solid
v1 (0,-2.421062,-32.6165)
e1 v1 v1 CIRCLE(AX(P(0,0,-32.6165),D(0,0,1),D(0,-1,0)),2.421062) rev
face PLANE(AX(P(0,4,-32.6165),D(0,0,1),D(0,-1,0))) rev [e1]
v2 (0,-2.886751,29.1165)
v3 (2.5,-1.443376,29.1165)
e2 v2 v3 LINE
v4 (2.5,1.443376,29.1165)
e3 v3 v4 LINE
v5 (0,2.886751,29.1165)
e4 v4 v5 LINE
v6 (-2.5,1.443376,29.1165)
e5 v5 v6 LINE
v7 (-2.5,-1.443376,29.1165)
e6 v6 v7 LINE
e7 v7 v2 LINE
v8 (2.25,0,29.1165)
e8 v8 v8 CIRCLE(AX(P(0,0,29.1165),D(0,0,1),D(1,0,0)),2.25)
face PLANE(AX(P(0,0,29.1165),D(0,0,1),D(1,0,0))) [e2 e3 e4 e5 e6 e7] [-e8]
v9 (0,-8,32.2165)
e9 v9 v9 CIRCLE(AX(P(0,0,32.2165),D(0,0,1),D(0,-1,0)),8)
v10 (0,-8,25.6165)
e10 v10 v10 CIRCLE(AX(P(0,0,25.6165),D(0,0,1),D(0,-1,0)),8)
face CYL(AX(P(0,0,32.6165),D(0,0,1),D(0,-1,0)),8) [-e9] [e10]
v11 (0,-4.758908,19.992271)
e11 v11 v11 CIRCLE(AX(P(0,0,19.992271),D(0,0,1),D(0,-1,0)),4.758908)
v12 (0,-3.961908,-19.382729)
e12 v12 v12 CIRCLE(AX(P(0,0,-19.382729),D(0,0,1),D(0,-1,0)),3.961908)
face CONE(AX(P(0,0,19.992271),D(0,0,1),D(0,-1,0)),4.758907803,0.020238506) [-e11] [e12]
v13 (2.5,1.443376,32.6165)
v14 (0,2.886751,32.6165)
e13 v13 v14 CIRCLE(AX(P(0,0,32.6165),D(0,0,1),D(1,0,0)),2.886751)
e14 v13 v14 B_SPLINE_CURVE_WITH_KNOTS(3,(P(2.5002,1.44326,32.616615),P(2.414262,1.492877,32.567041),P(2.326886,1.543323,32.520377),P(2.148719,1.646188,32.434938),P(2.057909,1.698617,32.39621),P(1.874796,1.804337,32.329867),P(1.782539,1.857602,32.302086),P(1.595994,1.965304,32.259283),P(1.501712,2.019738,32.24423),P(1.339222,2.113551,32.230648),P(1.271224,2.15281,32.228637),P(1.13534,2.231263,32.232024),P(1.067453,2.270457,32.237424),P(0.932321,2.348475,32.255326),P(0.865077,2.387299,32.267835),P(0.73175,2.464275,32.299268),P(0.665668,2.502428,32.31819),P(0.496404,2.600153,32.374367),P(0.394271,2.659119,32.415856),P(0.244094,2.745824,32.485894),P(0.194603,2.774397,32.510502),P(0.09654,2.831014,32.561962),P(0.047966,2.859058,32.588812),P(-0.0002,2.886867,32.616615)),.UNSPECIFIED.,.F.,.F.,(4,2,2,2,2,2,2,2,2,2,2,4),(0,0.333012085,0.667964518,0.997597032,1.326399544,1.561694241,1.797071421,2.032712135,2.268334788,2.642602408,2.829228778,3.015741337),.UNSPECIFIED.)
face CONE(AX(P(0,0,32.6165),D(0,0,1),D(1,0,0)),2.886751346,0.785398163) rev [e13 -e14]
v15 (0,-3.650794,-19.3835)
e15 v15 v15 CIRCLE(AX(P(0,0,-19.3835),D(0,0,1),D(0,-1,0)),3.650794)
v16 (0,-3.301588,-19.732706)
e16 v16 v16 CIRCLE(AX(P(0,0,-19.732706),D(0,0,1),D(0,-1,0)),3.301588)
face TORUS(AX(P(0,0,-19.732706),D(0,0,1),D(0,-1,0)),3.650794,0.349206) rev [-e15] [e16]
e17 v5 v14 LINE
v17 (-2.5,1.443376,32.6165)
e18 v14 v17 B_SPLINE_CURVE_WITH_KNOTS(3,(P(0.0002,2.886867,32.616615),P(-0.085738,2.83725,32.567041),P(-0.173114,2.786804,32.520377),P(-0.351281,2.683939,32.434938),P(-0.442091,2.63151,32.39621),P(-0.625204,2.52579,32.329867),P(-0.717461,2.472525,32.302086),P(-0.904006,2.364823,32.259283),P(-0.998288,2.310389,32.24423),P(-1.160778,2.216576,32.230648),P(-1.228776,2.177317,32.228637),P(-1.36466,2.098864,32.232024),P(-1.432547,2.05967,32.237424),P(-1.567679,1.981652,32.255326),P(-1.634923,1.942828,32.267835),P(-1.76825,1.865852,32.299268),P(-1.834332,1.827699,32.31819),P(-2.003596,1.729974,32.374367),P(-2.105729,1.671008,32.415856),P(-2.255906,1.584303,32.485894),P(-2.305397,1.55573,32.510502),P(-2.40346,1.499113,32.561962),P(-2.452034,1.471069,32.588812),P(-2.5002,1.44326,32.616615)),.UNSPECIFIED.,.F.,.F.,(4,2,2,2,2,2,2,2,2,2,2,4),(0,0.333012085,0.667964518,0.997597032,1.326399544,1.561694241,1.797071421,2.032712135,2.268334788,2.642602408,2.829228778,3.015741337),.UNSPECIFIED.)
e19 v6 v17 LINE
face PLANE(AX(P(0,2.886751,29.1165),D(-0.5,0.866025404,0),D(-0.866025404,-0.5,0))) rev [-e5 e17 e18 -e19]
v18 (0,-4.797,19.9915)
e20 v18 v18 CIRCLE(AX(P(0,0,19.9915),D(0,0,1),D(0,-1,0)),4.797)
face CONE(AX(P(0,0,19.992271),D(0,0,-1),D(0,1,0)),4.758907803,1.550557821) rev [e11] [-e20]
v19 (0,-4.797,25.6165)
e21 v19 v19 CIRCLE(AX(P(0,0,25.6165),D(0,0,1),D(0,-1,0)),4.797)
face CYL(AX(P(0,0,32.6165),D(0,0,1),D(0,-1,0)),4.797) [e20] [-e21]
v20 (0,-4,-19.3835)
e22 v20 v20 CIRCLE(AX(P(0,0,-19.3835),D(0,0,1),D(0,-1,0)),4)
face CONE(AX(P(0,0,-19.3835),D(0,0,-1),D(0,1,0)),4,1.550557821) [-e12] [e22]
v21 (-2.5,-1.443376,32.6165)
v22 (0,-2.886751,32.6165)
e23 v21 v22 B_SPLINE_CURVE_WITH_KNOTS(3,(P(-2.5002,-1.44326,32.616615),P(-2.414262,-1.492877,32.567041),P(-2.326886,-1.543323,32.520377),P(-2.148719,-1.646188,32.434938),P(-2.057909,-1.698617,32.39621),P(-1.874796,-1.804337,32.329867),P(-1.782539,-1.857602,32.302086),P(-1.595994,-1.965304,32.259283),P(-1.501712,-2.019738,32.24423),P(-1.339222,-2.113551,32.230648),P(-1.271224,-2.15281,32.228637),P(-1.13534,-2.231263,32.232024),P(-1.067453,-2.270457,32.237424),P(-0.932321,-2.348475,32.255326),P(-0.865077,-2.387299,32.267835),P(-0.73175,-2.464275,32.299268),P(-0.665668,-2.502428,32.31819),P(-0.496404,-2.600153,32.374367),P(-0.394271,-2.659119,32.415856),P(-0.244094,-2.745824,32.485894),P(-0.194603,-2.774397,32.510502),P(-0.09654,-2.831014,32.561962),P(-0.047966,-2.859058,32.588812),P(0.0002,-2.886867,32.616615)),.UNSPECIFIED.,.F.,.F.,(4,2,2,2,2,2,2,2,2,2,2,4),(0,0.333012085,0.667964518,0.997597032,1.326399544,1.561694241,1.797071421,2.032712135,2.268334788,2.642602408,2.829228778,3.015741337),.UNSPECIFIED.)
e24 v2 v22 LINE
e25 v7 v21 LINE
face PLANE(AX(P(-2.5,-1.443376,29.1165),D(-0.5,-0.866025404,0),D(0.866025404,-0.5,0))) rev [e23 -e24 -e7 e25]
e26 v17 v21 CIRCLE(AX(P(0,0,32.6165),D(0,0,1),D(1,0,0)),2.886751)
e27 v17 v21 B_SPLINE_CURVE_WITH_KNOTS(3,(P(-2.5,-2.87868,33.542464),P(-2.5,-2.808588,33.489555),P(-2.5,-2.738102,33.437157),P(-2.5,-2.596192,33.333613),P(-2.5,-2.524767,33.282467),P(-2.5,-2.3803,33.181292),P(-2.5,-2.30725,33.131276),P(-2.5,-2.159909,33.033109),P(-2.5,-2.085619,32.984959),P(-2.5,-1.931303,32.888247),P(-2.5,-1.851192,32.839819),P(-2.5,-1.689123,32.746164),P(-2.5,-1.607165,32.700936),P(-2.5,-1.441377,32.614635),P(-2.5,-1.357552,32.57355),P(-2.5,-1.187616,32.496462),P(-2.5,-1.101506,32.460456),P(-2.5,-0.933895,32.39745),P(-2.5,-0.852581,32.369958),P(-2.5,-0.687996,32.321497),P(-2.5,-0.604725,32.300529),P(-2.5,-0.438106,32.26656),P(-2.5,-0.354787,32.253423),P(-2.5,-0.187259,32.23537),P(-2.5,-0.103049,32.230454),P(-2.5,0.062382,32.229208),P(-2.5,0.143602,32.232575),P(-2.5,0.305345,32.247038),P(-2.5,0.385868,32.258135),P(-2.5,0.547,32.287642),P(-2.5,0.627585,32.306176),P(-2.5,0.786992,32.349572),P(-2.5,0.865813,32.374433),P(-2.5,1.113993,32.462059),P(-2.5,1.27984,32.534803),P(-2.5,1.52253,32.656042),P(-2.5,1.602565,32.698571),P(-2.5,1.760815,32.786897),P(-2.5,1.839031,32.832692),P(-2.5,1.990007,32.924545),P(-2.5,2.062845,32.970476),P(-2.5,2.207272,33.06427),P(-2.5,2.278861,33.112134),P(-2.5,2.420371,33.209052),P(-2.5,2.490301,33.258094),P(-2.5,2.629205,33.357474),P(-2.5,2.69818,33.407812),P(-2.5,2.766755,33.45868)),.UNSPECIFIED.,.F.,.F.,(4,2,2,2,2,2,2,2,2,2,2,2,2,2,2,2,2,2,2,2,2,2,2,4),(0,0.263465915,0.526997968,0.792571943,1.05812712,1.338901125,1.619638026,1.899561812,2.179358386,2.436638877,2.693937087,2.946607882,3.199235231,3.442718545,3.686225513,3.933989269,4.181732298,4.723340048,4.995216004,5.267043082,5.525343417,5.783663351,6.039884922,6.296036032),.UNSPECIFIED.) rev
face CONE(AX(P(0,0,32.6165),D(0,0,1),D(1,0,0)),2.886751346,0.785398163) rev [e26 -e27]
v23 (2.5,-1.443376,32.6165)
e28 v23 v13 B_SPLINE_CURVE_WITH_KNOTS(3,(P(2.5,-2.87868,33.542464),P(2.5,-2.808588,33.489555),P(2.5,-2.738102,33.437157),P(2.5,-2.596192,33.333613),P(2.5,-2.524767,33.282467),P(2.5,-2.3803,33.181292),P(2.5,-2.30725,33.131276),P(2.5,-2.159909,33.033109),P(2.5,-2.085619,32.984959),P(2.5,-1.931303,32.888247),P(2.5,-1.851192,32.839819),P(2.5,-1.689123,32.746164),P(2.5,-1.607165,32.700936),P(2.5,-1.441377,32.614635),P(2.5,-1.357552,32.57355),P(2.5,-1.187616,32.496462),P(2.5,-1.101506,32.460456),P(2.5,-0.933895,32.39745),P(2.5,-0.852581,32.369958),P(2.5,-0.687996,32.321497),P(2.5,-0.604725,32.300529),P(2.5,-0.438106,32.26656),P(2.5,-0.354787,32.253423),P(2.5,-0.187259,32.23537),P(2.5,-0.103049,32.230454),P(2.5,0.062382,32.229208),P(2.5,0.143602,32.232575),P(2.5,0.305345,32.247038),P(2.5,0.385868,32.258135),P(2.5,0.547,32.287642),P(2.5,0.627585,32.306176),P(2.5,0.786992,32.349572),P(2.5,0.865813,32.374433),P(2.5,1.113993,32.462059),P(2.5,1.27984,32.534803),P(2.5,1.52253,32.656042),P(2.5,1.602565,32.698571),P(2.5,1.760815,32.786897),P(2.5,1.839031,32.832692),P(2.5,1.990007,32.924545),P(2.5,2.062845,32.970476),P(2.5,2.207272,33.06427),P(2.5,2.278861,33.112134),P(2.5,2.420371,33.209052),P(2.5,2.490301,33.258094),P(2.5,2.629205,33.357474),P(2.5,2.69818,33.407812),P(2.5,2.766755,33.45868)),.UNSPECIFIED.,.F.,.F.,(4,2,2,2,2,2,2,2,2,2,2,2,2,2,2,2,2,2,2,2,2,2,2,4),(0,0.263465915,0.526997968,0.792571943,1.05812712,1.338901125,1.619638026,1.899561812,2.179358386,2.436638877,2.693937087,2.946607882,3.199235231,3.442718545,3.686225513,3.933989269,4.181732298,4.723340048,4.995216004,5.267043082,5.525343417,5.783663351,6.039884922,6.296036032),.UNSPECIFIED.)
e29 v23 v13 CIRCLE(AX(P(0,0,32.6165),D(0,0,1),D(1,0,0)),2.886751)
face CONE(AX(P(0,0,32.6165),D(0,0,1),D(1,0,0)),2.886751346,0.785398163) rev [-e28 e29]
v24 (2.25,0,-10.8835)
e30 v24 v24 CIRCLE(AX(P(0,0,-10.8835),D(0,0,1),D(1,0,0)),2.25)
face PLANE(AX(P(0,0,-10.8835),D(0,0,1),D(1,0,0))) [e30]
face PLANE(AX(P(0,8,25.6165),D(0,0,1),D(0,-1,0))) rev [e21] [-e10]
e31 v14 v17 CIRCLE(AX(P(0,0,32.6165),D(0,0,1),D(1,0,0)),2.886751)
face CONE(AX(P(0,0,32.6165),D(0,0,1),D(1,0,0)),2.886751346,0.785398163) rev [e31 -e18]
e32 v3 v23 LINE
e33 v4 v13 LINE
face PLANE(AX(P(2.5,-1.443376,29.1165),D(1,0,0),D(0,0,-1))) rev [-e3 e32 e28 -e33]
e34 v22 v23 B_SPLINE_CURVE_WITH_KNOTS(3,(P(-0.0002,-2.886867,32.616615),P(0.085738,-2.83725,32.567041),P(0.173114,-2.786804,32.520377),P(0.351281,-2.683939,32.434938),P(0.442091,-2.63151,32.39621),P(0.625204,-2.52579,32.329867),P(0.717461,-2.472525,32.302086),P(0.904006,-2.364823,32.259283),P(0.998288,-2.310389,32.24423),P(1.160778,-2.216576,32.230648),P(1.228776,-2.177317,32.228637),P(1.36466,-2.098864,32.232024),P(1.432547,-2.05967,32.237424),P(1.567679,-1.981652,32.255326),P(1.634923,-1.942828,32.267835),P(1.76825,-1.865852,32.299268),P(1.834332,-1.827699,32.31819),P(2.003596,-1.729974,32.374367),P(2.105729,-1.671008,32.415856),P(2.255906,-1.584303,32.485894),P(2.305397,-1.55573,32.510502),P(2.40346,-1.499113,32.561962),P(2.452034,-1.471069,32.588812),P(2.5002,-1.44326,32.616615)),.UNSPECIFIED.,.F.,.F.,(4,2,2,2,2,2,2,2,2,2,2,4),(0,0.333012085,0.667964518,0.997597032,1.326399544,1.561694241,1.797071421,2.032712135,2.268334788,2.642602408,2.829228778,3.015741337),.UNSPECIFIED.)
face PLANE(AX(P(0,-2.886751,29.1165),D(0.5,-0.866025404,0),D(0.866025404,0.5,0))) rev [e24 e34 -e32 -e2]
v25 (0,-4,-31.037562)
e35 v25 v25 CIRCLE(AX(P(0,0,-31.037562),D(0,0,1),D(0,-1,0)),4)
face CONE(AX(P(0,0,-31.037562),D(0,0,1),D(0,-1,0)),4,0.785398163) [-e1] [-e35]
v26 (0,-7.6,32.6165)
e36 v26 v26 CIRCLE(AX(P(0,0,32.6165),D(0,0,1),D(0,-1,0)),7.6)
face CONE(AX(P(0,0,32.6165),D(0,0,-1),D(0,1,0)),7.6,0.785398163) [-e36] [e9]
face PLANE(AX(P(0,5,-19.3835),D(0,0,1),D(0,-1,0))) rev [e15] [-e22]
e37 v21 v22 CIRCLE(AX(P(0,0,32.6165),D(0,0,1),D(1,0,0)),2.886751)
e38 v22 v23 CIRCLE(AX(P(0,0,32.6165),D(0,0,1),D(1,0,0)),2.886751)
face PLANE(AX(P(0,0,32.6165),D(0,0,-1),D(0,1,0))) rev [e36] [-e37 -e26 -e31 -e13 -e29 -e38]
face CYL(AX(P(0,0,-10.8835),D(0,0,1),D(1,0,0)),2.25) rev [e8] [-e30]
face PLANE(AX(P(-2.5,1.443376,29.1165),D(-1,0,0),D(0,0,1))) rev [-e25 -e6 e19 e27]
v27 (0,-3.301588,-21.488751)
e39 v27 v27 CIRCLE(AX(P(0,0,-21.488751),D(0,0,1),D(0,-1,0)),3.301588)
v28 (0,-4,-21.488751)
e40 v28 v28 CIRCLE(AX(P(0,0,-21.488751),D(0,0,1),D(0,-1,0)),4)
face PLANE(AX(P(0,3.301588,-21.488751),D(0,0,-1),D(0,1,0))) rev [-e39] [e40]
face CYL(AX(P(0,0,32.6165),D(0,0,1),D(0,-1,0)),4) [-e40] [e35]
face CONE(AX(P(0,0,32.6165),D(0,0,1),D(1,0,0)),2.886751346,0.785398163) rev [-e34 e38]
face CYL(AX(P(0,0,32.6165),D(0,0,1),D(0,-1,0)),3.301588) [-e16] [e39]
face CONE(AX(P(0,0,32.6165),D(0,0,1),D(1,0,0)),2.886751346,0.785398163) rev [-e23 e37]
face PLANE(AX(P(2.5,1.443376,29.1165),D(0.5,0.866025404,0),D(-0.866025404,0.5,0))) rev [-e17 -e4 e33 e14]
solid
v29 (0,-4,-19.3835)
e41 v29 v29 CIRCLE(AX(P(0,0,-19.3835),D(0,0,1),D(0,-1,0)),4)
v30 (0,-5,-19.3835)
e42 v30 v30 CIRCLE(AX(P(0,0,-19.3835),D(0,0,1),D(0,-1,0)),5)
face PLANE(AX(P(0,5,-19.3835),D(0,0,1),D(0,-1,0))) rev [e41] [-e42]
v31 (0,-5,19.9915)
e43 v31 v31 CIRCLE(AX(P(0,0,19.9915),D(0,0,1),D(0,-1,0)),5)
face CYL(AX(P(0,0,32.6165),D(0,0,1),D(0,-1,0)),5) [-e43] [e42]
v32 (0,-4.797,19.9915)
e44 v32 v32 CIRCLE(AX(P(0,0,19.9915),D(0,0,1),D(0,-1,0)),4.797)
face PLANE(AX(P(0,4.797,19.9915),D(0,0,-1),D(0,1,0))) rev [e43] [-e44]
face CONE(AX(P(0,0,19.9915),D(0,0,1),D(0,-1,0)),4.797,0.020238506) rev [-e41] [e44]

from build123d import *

# Parameters (mm, degrees)
CUT_EXTRUDE1_START = 32.6165
CUT_EXTRUDE1_DEPTH = 3.5
CHAMFER2_SIZE      = 1.578938402
SKETCH16_R         = 2.25
CUT_EXTRUDE3_DEPTH = 40


# Read off the part's stored shape, not the designer's step: Cut-Revolve-Thin1
with BuildPart() as part:
    # Sketch3 → Revolve1 (revolve)
    with BuildSketch(Plane(origin=(0, 0, 0), x_dir=(0, 0, -1), z_dir=(1, 0, 0)), mode=Mode.PRIVATE) as revolve1_sk:
        with BuildLine():
            Line((-32.6165, 0), (-32.6165, 7.48))
            Line((-32.6165, 7.48), (-32.6165, 8))
            Line((-32.6165, 8), (-26.1365, 8))
            Line((-26.1365, 8), (-25.6165, 8))
            Line((-25.6165, 8), (-25.6165, 4.797))
            Line((-25.6165, 4.797), (-19.9915, 4.797))
            Line((-19.9915, 4.797), (-19.9915, 5))
            Line((-19.9915, 5), (19.3835, 5))
            Line((19.3835, 5), (19.3835, 3.650794))
            ThreePointArc((19.3835, 3.650794), (19.485780069, 3.403868069), (19.732706, 3.301588))
            Line((19.732706, 3.301588), (21.488751203, 3.301588))
            Line((21.488751203, 3.301588), (21.488751203, 4))
            Line((21.488751203, 4), (31.679, 4))
            Line((31.679, 4), (32.6165, 4))
            Line((32.6165, 4), (32.6165, 0))
            Line((32.6165, 0), (-32.6165, 0))
        make_face()
    revolve(revolve1_sk.sketch.rotate(Axis((0, 0, 32.6165), (0, 0, -1)), 180), axis=Axis((0, 0, 32.6165), (0, 0, -1)))

    # Cut-Revolve-Thin1 outline → Cut-Revolve-Thin1 (revolve, cut)
    with BuildSketch(Plane.XZ):
        Polygon((4.758907803, 19.992271034), (3.961907803, -19.382728966), (4, -19.3835), (4.797, 19.9915), align=None)
    revolve(axis=Axis((0, 0, 0), (0, 0, 1)), mode=Mode.SUBTRACT)

    # Sketch4 → Cut-Extrude1 (cut)
    with BuildSketch(Plane.XY.offset(CUT_EXTRUDE1_START)):
        Polygon((0, 2.886751346), (-2.5, 1.443375673), (-2.5, -1.443375673), (0, -2.886751346), (2.5, -1.443375673), (2.5, 1.443375673), align=None)
    extrude(amount=-CUT_EXTRUDE1_DEPTH, mode=Mode.SUBTRACT)

    # Cut-Extrude2 cone 1 section (through the dimple's axis) → Cut-Extrude2 (revolve, cut)
    with BuildSketch(Plane(origin=(0, 0, 32.6165), x_dir=(0, -1, 0), z_dir=(1, 0, 0))):
        Polygon((0, 0), (2.886751346, 0), (0, 2.886751346), align=None)
    revolve(axis=Axis((0, 0, 32.6165), (0, 0, -1)), mode=Mode.SUBTRACT)

    # Chamfer2
    chamfer2_edges = [part.edges().sort_by_distance(p)[0] for p in [
        (0, 4, -32.6165),
    ]]
    chamfer(chamfer2_edges, length=CHAMFER2_SIZE)

    # Sketch10 → Cut-Revolve2 (revolve, cut)
    with BuildSketch(Plane(origin=(0, 0, 0), x_dir=(0, 0, -1), z_dir=(1, 0, 0)), mode=Mode.PRIVATE) as cut_revolve2_sk:
        Polygon((-32.6165, 7.6), (-32.2165, 8), (-32.6165, 8), align=None)
    revolve(cut_revolve2_sk.sketch.rotate(Axis((0, 0, 32.6165), (0, 0, -1)), 180), axis=Axis((0, 0, 32.6165), (0, 0, -1)), mode=Mode.SUBTRACT)

    # Sketch16 → Cut-Extrude3 (cut)
    with BuildSketch(Plane.XY.offset(29.1165)):
        Circle(SKETCH16_R)
    extrude(amount=-CUT_EXTRUDE3_DEPTH, mode=Mode.SUBTRACT)


solid = part.part
